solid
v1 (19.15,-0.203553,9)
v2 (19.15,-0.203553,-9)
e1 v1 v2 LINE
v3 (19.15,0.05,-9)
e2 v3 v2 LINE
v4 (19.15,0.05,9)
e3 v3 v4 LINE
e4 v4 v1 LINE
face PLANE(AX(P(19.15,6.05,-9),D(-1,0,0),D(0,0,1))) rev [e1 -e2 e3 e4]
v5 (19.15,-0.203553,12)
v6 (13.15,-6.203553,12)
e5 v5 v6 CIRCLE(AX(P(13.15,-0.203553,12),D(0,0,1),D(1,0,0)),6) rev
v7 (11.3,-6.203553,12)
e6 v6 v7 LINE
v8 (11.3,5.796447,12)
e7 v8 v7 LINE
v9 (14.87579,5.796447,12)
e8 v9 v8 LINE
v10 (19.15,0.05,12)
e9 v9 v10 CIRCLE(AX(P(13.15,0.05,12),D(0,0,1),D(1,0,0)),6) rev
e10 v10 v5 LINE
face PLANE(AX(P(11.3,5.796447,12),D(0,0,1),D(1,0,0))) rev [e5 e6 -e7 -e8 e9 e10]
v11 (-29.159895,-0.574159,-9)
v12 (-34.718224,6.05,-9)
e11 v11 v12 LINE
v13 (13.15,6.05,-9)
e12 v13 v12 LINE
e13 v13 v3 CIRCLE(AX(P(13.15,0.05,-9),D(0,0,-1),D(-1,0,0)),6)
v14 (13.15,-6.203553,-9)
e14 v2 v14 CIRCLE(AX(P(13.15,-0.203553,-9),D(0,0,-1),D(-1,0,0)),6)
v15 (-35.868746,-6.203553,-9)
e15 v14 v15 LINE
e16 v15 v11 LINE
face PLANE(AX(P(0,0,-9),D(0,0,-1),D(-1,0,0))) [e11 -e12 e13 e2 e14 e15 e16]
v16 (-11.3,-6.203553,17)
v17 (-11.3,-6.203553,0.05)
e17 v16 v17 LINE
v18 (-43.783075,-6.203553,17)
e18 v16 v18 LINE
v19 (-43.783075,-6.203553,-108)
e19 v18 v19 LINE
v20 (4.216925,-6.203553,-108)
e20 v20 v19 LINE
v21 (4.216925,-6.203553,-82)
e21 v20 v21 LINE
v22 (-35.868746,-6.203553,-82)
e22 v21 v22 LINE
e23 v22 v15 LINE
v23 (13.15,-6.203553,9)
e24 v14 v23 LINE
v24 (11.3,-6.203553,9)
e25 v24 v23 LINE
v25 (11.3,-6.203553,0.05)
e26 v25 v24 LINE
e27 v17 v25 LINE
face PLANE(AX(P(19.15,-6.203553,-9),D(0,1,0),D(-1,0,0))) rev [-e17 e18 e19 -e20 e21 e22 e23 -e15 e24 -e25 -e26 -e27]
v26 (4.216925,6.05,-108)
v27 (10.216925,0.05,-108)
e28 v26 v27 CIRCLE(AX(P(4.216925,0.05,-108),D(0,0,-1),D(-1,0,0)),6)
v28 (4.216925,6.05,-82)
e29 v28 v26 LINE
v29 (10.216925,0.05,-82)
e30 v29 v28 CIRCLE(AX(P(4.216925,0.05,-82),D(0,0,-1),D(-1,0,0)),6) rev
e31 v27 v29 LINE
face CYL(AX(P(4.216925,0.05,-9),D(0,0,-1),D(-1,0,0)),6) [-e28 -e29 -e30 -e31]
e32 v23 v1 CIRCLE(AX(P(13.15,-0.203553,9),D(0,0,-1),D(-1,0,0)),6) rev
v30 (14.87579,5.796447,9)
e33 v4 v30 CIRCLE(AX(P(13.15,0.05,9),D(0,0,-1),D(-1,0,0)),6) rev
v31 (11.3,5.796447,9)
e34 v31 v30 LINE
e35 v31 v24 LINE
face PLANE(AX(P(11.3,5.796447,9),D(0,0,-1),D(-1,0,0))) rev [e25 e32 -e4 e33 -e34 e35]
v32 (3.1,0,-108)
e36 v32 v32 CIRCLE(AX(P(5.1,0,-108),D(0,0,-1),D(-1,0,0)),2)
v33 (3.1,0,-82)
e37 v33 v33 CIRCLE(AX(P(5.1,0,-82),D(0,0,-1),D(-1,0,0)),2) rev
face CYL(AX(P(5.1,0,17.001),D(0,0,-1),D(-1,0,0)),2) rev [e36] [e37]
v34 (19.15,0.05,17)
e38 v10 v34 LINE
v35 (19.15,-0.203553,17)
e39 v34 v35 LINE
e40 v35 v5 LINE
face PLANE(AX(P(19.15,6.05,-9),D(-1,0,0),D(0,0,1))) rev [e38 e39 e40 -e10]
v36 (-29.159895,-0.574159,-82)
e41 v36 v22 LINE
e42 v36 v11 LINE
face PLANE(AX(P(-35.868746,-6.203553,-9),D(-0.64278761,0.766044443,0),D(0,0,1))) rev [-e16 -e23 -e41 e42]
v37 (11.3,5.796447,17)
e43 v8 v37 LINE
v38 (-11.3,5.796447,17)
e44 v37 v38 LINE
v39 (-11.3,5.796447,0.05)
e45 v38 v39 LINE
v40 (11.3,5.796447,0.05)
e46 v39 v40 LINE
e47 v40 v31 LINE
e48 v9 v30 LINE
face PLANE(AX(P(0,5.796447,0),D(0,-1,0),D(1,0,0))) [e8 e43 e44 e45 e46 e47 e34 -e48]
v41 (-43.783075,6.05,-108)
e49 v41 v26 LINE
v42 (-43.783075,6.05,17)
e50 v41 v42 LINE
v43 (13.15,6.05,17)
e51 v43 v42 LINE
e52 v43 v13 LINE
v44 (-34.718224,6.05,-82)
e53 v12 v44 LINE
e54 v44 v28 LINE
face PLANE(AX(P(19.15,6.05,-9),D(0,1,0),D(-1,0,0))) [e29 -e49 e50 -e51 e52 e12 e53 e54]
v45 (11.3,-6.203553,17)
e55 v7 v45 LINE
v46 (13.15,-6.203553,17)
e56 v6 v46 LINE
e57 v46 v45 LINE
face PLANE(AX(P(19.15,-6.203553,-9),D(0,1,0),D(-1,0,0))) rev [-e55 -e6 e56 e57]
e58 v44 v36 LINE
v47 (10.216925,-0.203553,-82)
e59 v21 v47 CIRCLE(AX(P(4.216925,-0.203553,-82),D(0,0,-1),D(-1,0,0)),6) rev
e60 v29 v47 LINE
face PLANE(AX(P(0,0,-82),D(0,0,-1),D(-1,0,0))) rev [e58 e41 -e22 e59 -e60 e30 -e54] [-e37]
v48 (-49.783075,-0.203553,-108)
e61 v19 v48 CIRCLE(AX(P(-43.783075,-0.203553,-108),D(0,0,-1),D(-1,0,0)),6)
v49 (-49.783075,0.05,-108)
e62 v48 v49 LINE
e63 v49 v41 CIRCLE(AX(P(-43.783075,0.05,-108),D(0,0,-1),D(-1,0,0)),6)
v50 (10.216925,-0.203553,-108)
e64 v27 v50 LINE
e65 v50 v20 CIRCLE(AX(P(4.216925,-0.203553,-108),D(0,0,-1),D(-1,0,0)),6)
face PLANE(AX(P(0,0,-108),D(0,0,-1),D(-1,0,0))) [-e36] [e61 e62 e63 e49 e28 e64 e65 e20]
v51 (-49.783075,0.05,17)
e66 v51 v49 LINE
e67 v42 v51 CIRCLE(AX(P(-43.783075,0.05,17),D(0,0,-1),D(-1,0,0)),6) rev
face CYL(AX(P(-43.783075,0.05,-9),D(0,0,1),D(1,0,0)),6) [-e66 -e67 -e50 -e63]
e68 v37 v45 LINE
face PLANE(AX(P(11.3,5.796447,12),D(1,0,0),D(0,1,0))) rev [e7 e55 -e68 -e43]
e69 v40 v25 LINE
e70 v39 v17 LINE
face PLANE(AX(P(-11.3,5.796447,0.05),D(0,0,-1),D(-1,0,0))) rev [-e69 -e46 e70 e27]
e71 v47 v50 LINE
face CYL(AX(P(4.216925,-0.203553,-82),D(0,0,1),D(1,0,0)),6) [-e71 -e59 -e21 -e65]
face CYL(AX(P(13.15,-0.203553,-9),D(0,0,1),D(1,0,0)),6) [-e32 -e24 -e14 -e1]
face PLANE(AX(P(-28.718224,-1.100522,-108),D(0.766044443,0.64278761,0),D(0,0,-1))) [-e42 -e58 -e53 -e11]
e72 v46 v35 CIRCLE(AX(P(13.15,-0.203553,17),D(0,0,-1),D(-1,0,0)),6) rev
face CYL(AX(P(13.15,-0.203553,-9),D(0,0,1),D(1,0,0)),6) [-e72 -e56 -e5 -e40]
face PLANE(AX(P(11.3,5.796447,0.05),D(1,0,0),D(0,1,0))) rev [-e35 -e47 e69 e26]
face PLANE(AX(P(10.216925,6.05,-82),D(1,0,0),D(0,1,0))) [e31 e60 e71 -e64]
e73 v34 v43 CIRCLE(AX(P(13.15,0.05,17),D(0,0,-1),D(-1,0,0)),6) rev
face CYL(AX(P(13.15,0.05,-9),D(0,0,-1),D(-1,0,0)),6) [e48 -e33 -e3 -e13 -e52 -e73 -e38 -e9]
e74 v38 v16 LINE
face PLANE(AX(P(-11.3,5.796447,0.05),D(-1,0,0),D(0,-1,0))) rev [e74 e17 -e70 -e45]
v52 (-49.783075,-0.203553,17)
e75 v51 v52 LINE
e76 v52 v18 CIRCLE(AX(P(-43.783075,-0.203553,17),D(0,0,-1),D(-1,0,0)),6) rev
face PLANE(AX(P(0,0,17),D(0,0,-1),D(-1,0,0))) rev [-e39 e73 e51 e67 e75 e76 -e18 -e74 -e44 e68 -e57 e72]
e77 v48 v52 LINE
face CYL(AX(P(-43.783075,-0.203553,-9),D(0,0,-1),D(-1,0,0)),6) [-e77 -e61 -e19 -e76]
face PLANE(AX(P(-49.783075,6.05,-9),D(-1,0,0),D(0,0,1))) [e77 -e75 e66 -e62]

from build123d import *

# Parameters (mm, degrees)
SALIENTE_EXTRUIR1_DEPTH      = 17
SALIENTE_EXTRUIR1_DEPTH_BACK = 9
CROQUIS1_W                   = 68.933075381
CROQUIS1_H                   = 12.253553391
CROQUIS2_W                   = 21.064851014
CROQUIS2_H                   = 12.253553391
SALIENTE_EXTRUIR2_DEPTH      = 99
CROQUIS3_W                   = 60
CROQUIS3_H                   = 12.253553391
SALIENTE_EXTRUIR3_DEPTH      = 26
REDONDEO1_R                  = 6
CHAFL_N1_SIZE                = 6
CHAFL_N1_SIZE_2              = 7.150521556
CORTAR_EXTRUIR1_REACH        = 136.692
CROQUIS5_R                   = 2
REDONDEO2_R                  = 6
CORTAR_EXTRUIR2_DEPTH        = 12


with BuildPart() as part:
    # Croquis1 → Saliente-Extruir1 (new, two sides: drawn at the far end of the back side and taken through both)
    with BuildSketch(Plane.XY.offset(-SALIENTE_EXTRUIR1_DEPTH_BACK)):
        with Locations((-15.316537691, -0.076776695)):
            Rectangle(CROQUIS1_W, CROQUIS1_H)
    extrude(amount=SALIENTE_EXTRUIR1_DEPTH + SALIENTE_EXTRUIR1_DEPTH_BACK)

    # Croquis2 → Saliente-Extruir2 (add)
    with BuildSketch(Plane(origin=(0, 0, -9), x_dir=(-1, 0, 0), z_dir=(0, 0, -1))):
        with Locations((39.250649874, -0.076776695)):
            Rectangle(CROQUIS2_W, CROQUIS2_H)
    extrude(amount=SALIENTE_EXTRUIR2_DEPTH)

    # Croquis3 → Saliente-Extruir3 (add)
    with BuildSketch(Plane(origin=(0, 0, -108), x_dir=(-1, 0, 0), z_dir=(0, 0, -1))):
        with Locations((19.783075381, -0.076776695)):
            Rectangle(CROQUIS3_W, CROQUIS3_H)
    extrude(amount=-SALIENTE_EXTRUIR3_DEPTH)

    # Redondeo1
    redondeo1_edges = [part.edges().sort_by_distance(p)[0] for p in [
        (-49.783075381, 6.05, -45.5),
        (-49.783075381, -6.203553391, -45.5),
    ]]
    fillet(redondeo1_edges, radius=REDONDEO1_R)

    # Chaflán1
    # the kernel refuses this chamfer: 7.150521556, 6 mm, written as the material it takes off along each edge
    with BuildSketch(Plane(origin=(-28.718224367, -6.203553391, -9), x_dir=(0.03540953691366326, 0.9993728857116146, 0), z_dir=(0, 0, -1)), Plane(origin=(-28.718224367, 6.05, -9), x_dir=(-0.9993728857116146, 0.03540953691366412, 0), z_dir=(0, 0, -1))) as chafl_n1_piece_1:
        Polygon((CHAFL_N1_SIZE * 0.999372885712, -CHAFL_N1_SIZE * 0.0354095369137), (-CHAFL_N1_SIZE_2 * 0.0354095369115, -CHAFL_N1_SIZE_2 * 0.999372885651), (0, 0), align=None)
    extrude(amount=73, mode=Mode.SUBTRACT)

    # Croquis5 → Cortar-Extruir1 (cut, up to next)
    with BuildSketch(Plane(origin=(0, 0, -108), x_dir=(-1, 0, 0), z_dir=(0, 0, -1)), mode=Mode.PRIVATE) as cortar_extruir1_sk1:
        with Locations((-5.1, 0)):
            Circle(CROQUIS5_R)
    cortar_extruir1_tool1 = extrude(cortar_extruir1_sk1.sketch, amount=-CORTAR_EXTRUIR1_REACH, mode=Mode.PRIVATE) & part.part
    add(cortar_extruir1_tool1.solids().sort_by_distance((5.1, 0, -108))[0], mode=Mode.SUBTRACT)

    # Redondeo2
    redondeo2_edges = [part.edges().sort_by_distance(p)[0] for p in [
        (10.216924619, 6.05, -95),
        (10.216924619, -6.203553391, -95),
        (19.15, 6.05, 4),
        (19.15, -6.203553391, 4),
    ]]
    fillet(redondeo2_edges, radius=REDONDEO2_R)

    # Croquis6 → Cortar-Extruir2 (cut)
    with BuildSketch(Plane.XZ.offset(6.203553391)):
        Polygon((-11.3, 0.05), (-11.3, 17), (11.3, 17), (11.3, 12), (19.15, 12), (19.15, 9), (11.3, 9), (11.3, 0.05), align=None)
    extrude(amount=-CORTAR_EXTRUIR2_DEPTH, mode=Mode.SUBTRACT)


solid = part.part
